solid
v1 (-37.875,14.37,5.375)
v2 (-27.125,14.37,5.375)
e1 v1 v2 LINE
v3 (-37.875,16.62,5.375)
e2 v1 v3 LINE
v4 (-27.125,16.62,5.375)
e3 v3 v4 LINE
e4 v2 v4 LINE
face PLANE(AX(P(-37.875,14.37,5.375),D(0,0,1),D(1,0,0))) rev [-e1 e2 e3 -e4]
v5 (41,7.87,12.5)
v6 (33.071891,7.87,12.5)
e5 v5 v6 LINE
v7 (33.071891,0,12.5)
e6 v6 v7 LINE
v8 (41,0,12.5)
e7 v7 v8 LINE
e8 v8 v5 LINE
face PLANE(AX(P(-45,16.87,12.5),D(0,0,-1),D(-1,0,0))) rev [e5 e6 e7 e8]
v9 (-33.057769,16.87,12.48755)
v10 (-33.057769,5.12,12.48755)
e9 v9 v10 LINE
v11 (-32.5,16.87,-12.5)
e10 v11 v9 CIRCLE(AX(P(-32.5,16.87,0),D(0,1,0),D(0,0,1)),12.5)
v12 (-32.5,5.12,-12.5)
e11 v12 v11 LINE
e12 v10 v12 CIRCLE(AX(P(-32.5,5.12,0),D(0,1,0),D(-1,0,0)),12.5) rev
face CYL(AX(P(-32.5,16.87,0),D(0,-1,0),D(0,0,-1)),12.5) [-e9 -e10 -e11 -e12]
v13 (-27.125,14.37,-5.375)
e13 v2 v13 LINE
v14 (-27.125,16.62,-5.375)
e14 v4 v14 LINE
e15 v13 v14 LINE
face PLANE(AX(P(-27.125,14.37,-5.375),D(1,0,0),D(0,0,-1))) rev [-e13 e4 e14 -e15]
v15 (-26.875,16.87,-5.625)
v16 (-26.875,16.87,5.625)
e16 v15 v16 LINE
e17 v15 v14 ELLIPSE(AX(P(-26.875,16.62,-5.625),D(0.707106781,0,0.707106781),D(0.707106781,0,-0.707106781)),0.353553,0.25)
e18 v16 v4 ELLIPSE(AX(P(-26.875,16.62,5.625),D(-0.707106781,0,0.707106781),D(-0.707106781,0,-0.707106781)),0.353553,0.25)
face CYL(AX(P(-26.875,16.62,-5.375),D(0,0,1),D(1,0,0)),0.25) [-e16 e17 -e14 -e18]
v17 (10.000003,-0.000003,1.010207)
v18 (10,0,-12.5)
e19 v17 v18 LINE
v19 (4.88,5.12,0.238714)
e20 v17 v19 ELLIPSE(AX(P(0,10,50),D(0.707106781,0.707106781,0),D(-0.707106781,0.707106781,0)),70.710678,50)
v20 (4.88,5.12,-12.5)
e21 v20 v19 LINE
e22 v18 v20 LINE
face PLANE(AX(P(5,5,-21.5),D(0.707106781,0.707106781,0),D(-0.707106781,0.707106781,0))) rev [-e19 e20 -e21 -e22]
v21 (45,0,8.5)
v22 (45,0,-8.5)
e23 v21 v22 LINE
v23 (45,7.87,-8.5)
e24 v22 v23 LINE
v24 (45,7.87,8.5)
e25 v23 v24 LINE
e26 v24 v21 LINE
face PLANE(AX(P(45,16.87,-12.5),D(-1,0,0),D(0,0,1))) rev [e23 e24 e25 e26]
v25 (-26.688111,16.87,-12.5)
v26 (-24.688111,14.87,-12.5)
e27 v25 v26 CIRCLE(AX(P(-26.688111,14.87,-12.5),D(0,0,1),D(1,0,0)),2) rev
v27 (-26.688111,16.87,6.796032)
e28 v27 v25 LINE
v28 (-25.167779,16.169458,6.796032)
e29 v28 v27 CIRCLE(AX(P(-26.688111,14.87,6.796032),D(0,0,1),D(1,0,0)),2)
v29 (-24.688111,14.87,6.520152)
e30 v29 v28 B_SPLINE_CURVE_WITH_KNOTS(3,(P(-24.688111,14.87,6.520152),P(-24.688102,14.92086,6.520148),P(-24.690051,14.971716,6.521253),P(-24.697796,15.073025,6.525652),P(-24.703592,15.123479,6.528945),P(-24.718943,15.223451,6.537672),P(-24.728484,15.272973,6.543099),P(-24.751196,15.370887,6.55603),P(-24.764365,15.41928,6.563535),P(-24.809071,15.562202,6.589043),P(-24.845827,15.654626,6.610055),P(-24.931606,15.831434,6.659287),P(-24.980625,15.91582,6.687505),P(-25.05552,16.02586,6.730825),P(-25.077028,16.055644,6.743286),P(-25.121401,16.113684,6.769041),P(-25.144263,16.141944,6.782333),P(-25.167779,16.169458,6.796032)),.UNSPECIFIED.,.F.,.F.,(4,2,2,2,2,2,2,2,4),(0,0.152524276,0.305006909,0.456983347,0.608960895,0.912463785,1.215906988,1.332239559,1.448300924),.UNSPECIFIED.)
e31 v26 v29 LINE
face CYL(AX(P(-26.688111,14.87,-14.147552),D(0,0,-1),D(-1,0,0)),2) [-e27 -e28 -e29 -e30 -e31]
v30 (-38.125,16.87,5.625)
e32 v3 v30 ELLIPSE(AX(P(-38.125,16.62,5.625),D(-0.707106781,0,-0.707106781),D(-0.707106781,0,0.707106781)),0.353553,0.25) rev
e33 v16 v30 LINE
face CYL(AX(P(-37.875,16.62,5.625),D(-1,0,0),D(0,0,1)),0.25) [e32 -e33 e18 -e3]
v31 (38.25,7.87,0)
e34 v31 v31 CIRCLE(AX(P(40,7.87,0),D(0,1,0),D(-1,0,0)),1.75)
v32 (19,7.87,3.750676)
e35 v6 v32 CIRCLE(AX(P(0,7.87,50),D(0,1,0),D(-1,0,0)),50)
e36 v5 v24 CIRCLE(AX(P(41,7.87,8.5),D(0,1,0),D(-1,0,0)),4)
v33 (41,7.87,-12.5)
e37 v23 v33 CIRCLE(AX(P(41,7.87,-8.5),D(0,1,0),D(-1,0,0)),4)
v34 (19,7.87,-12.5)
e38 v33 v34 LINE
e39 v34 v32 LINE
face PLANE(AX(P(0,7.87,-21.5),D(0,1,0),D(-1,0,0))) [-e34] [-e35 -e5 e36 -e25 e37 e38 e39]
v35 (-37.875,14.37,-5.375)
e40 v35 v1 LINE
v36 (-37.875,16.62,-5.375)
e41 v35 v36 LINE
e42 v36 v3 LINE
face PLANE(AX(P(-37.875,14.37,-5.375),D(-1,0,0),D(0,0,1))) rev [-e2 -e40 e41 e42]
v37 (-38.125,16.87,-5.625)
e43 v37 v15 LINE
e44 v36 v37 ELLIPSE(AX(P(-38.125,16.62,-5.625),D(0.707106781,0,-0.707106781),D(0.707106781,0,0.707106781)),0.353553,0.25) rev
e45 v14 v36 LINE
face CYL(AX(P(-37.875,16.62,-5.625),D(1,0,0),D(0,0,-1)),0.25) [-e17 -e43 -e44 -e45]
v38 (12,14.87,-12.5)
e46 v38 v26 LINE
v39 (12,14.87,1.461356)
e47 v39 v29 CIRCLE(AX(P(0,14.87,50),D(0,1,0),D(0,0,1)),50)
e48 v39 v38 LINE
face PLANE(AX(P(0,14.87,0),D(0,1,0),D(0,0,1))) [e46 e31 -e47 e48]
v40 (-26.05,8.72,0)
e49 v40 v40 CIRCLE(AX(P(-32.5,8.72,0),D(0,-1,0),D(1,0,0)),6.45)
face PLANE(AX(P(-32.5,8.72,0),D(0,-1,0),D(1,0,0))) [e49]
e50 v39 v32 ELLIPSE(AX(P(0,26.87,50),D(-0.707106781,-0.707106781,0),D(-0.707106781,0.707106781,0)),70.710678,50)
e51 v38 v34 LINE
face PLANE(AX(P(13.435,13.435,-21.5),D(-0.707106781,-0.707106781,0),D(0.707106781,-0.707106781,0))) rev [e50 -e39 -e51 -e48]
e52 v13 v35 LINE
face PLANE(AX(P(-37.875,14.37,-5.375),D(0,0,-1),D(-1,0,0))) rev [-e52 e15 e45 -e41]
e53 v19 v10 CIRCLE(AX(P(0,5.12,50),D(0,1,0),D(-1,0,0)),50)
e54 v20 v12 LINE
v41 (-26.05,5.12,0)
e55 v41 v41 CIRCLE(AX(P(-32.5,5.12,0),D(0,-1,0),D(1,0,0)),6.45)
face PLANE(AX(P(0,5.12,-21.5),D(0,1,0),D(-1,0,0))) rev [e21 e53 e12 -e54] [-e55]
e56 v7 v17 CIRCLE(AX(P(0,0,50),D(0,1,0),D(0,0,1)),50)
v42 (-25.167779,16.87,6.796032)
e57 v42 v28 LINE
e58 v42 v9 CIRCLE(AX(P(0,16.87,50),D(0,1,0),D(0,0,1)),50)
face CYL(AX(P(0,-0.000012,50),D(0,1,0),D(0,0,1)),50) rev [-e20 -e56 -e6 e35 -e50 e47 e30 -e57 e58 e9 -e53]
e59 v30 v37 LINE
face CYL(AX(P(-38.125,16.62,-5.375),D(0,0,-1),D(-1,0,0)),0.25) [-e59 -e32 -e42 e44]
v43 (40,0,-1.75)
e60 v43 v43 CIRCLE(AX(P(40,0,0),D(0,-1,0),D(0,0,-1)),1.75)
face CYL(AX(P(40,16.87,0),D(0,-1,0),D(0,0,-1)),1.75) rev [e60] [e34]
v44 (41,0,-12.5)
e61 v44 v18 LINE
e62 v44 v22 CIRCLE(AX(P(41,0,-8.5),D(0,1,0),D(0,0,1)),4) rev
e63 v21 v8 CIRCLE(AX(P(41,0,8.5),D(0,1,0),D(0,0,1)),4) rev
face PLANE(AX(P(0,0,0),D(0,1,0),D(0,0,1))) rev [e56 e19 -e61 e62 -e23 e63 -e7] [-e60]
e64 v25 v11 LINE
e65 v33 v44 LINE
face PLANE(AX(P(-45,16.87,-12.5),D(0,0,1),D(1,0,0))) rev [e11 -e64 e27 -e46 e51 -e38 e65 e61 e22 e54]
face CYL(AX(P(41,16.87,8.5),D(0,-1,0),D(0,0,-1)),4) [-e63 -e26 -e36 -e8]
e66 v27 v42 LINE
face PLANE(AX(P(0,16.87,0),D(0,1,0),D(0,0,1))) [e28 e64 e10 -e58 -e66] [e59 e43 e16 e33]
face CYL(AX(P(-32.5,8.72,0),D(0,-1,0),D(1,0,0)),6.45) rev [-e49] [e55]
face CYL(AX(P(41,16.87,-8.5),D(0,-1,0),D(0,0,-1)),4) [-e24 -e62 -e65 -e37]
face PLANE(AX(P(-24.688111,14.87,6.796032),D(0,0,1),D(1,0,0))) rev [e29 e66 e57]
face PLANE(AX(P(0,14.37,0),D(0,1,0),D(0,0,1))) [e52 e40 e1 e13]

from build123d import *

# Parameters (mm, degrees)
SKETCH1_W                    = 90
SKETCH1_H                    = 25
BOSS_EXTRUDE1_DEPTH          = 16.87
SKETCH3_W                    = 10.75
SKETCH3_H                    = 10.75
CUT_EXTRUDE2_DEPTH           = 2.5
ENL_V_MAT_EXTRU_1_DEPTH      = 34
FILLET1_RADIUS               = 12.5
FILLET1_LENGTH               = 11.75
ESQUISSE5_R                  = 1.75
ENL_V_MAT_EXTRU_4_DEPTH      = 50.65729453
FILLET3_R                    = 4
SKETCH8_W                    = 38.029495875
SKETCH8_H                    = 20.943583685
CUT_EXTRUDE6_DEPTH           = 2
FILLET6_R                    = 2
FILLET7_R                    = 0.25
ESQUISSE17_R                 = 6.45
ENL_V_MAT_EXTRU_7_DEPTH      = 3.6
ENL_V_MAT_EXTRU_8_DEPTH      = 50.65729453
ENL_V_MAT_EXTRU_8_DEPTH_BACK = 50.65729453
ESQUISSE18_R                 = 50


with BuildPart() as part:
    # Sketch1 → Boss-Extrude1 (new body)
    with BuildSketch(Plane(origin=(0, 0, 0), x_dir=(1, 0, 0), z_dir=(0, 1, 0))):
        Rectangle(SKETCH1_W, SKETCH1_H)
    extrude(amount=BOSS_EXTRUDE1_DEPTH)

    # Sketch3 → Cut-Extrude2 (cut)
    with BuildSketch(Plane(origin=(0, 16.87, 0), x_dir=(1, 0, 0), z_dir=(0, 1, 0))):
        with Locations((-32.5, 0)):
            Rectangle(SKETCH3_W, SKETCH3_H)
    extrude(amount=-CUT_EXTRUDE2_DEPTH, mode=Mode.SUBTRACT)

    # Esquisse2 → Enlèv. mat.-Extru.1 (cut)
    with BuildSketch(Plane.XY.offset(12.5)):
        Polygon((45, 16.87), (10, 16.87), (19, 7.87), (45, 7.87), align=None)
        Polygon((-45, 0), (10, 0), (4.88, 5.12), (-45, 5.12), align=None)
    extrude(amount=-ENL_V_MAT_EXTRU_1_DEPTH, mode=Mode.SUBTRACT)

    # Fillet1: full round fillet: the end face becomes a half cylinder, R = half its width
    fillet1_face = Plane((-45, 10.995, 0), x_dir=(0, -1, 0), z_dir=(-1, 0, 0))  # on the end face: x along it, z out of the body
    fillet1_slab = fillet1_face.offset(-FILLET1_RADIUS / 2) * Box(FILLET1_LENGTH, 2 * FILLET1_RADIUS, FILLET1_RADIUS, mode=Mode.PRIVATE)  # the body's end, R deep
    fillet1_round = Plane((-32.5, 10.995, 0), x_dir=(-1, 0, 0), z_dir=(0, -1, 0)) * Cylinder(FILLET1_RADIUS, FILLET1_LENGTH, mode=Mode.PRIVATE)  # its axis R under the face
    add(fillet1_slab - fillet1_round, mode=Mode.SUBTRACT)

    # Esquisse5 → Enlèv. mat.-Extru.4 (cut, through all)
    with BuildSketch(Plane(origin=(0, 0, 0), x_dir=(-1, 0, 0), z_dir=(0, -1, 0))):
        with Locations(Location((-40, 0, 0), (0, 0, 90))):
            Circle(ESQUISSE5_R)
    extrude(amount=-ENL_V_MAT_EXTRU_4_DEPTH, mode=Mode.SUBTRACT)

    # Fillet3
    fillet3_edges = [part.edges().sort_by_distance(p)[0] for p in [
        (45, 3.935, -12.5),
        (45, 3.935, 12.5),
    ]]
    fillet(fillet3_edges, radius=FILLET3_R)

    # Sketch8 → Cut-Extrude6 (cut)
    with BuildSketch(Plane(origin=(0, 16.87, 0), x_dir=(1, 0, 0), z_dir=(0, 1, 0))):
        with Locations((-5.673362901, 3.675760168)):
            Rectangle(SKETCH8_W, SKETCH8_H)
    extrude(amount=-CUT_EXTRUDE6_DEPTH, mode=Mode.SUBTRACT)

    # Fillet6
    fillet6_edges = [part.edges().sort_by_distance(p)[0] for p in [
        (-24.688110839, 16.87, -2.851984162),
    ]]
    fillet(fillet6_edges, radius=FILLET6_R - 0.0001)  # a hair under: the kernel refuses the full size

    # Fillet7
    fillet7_edges = [part.edges().sort_by_distance(p)[0] for p in [
        (-37.875, 16.87, 0),
        (-32.5, 16.87, 5.375),
        (-27.125, 16.87, 0),
        (-32.5, 16.87, -5.375),
    ]]
    fillet(fillet7_edges, radius=FILLET7_R)

    # Esquisse17 → Enlèv. mat.-Extru.7 (cut)
    with BuildSketch(Plane.XZ.offset(-5.12)):
        with Locations((-32.5, 0)):
            Circle(ESQUISSE17_R)
    extrude(amount=-ENL_V_MAT_EXTRU_7_DEPTH, mode=Mode.SUBTRACT)

    # Esquisse18 → Enlèv. mat.-Extru.8 (cut, two sides: drawn at the far end of the back side and taken through both)
    with BuildSketch(Plane(origin=(0, 0, 0), x_dir=(1, 0, 0), z_dir=(0, 1, 0)).offset(-ENL_V_MAT_EXTRU_8_DEPTH_BACK)):
        with Locations((0, -50)):
            Circle(ESQUISSE18_R)
    extrude(amount=ENL_V_MAT_EXTRU_8_DEPTH + ENL_V_MAT_EXTRU_8_DEPTH_BACK, mode=Mode.SUBTRACT)


solid = part.part
